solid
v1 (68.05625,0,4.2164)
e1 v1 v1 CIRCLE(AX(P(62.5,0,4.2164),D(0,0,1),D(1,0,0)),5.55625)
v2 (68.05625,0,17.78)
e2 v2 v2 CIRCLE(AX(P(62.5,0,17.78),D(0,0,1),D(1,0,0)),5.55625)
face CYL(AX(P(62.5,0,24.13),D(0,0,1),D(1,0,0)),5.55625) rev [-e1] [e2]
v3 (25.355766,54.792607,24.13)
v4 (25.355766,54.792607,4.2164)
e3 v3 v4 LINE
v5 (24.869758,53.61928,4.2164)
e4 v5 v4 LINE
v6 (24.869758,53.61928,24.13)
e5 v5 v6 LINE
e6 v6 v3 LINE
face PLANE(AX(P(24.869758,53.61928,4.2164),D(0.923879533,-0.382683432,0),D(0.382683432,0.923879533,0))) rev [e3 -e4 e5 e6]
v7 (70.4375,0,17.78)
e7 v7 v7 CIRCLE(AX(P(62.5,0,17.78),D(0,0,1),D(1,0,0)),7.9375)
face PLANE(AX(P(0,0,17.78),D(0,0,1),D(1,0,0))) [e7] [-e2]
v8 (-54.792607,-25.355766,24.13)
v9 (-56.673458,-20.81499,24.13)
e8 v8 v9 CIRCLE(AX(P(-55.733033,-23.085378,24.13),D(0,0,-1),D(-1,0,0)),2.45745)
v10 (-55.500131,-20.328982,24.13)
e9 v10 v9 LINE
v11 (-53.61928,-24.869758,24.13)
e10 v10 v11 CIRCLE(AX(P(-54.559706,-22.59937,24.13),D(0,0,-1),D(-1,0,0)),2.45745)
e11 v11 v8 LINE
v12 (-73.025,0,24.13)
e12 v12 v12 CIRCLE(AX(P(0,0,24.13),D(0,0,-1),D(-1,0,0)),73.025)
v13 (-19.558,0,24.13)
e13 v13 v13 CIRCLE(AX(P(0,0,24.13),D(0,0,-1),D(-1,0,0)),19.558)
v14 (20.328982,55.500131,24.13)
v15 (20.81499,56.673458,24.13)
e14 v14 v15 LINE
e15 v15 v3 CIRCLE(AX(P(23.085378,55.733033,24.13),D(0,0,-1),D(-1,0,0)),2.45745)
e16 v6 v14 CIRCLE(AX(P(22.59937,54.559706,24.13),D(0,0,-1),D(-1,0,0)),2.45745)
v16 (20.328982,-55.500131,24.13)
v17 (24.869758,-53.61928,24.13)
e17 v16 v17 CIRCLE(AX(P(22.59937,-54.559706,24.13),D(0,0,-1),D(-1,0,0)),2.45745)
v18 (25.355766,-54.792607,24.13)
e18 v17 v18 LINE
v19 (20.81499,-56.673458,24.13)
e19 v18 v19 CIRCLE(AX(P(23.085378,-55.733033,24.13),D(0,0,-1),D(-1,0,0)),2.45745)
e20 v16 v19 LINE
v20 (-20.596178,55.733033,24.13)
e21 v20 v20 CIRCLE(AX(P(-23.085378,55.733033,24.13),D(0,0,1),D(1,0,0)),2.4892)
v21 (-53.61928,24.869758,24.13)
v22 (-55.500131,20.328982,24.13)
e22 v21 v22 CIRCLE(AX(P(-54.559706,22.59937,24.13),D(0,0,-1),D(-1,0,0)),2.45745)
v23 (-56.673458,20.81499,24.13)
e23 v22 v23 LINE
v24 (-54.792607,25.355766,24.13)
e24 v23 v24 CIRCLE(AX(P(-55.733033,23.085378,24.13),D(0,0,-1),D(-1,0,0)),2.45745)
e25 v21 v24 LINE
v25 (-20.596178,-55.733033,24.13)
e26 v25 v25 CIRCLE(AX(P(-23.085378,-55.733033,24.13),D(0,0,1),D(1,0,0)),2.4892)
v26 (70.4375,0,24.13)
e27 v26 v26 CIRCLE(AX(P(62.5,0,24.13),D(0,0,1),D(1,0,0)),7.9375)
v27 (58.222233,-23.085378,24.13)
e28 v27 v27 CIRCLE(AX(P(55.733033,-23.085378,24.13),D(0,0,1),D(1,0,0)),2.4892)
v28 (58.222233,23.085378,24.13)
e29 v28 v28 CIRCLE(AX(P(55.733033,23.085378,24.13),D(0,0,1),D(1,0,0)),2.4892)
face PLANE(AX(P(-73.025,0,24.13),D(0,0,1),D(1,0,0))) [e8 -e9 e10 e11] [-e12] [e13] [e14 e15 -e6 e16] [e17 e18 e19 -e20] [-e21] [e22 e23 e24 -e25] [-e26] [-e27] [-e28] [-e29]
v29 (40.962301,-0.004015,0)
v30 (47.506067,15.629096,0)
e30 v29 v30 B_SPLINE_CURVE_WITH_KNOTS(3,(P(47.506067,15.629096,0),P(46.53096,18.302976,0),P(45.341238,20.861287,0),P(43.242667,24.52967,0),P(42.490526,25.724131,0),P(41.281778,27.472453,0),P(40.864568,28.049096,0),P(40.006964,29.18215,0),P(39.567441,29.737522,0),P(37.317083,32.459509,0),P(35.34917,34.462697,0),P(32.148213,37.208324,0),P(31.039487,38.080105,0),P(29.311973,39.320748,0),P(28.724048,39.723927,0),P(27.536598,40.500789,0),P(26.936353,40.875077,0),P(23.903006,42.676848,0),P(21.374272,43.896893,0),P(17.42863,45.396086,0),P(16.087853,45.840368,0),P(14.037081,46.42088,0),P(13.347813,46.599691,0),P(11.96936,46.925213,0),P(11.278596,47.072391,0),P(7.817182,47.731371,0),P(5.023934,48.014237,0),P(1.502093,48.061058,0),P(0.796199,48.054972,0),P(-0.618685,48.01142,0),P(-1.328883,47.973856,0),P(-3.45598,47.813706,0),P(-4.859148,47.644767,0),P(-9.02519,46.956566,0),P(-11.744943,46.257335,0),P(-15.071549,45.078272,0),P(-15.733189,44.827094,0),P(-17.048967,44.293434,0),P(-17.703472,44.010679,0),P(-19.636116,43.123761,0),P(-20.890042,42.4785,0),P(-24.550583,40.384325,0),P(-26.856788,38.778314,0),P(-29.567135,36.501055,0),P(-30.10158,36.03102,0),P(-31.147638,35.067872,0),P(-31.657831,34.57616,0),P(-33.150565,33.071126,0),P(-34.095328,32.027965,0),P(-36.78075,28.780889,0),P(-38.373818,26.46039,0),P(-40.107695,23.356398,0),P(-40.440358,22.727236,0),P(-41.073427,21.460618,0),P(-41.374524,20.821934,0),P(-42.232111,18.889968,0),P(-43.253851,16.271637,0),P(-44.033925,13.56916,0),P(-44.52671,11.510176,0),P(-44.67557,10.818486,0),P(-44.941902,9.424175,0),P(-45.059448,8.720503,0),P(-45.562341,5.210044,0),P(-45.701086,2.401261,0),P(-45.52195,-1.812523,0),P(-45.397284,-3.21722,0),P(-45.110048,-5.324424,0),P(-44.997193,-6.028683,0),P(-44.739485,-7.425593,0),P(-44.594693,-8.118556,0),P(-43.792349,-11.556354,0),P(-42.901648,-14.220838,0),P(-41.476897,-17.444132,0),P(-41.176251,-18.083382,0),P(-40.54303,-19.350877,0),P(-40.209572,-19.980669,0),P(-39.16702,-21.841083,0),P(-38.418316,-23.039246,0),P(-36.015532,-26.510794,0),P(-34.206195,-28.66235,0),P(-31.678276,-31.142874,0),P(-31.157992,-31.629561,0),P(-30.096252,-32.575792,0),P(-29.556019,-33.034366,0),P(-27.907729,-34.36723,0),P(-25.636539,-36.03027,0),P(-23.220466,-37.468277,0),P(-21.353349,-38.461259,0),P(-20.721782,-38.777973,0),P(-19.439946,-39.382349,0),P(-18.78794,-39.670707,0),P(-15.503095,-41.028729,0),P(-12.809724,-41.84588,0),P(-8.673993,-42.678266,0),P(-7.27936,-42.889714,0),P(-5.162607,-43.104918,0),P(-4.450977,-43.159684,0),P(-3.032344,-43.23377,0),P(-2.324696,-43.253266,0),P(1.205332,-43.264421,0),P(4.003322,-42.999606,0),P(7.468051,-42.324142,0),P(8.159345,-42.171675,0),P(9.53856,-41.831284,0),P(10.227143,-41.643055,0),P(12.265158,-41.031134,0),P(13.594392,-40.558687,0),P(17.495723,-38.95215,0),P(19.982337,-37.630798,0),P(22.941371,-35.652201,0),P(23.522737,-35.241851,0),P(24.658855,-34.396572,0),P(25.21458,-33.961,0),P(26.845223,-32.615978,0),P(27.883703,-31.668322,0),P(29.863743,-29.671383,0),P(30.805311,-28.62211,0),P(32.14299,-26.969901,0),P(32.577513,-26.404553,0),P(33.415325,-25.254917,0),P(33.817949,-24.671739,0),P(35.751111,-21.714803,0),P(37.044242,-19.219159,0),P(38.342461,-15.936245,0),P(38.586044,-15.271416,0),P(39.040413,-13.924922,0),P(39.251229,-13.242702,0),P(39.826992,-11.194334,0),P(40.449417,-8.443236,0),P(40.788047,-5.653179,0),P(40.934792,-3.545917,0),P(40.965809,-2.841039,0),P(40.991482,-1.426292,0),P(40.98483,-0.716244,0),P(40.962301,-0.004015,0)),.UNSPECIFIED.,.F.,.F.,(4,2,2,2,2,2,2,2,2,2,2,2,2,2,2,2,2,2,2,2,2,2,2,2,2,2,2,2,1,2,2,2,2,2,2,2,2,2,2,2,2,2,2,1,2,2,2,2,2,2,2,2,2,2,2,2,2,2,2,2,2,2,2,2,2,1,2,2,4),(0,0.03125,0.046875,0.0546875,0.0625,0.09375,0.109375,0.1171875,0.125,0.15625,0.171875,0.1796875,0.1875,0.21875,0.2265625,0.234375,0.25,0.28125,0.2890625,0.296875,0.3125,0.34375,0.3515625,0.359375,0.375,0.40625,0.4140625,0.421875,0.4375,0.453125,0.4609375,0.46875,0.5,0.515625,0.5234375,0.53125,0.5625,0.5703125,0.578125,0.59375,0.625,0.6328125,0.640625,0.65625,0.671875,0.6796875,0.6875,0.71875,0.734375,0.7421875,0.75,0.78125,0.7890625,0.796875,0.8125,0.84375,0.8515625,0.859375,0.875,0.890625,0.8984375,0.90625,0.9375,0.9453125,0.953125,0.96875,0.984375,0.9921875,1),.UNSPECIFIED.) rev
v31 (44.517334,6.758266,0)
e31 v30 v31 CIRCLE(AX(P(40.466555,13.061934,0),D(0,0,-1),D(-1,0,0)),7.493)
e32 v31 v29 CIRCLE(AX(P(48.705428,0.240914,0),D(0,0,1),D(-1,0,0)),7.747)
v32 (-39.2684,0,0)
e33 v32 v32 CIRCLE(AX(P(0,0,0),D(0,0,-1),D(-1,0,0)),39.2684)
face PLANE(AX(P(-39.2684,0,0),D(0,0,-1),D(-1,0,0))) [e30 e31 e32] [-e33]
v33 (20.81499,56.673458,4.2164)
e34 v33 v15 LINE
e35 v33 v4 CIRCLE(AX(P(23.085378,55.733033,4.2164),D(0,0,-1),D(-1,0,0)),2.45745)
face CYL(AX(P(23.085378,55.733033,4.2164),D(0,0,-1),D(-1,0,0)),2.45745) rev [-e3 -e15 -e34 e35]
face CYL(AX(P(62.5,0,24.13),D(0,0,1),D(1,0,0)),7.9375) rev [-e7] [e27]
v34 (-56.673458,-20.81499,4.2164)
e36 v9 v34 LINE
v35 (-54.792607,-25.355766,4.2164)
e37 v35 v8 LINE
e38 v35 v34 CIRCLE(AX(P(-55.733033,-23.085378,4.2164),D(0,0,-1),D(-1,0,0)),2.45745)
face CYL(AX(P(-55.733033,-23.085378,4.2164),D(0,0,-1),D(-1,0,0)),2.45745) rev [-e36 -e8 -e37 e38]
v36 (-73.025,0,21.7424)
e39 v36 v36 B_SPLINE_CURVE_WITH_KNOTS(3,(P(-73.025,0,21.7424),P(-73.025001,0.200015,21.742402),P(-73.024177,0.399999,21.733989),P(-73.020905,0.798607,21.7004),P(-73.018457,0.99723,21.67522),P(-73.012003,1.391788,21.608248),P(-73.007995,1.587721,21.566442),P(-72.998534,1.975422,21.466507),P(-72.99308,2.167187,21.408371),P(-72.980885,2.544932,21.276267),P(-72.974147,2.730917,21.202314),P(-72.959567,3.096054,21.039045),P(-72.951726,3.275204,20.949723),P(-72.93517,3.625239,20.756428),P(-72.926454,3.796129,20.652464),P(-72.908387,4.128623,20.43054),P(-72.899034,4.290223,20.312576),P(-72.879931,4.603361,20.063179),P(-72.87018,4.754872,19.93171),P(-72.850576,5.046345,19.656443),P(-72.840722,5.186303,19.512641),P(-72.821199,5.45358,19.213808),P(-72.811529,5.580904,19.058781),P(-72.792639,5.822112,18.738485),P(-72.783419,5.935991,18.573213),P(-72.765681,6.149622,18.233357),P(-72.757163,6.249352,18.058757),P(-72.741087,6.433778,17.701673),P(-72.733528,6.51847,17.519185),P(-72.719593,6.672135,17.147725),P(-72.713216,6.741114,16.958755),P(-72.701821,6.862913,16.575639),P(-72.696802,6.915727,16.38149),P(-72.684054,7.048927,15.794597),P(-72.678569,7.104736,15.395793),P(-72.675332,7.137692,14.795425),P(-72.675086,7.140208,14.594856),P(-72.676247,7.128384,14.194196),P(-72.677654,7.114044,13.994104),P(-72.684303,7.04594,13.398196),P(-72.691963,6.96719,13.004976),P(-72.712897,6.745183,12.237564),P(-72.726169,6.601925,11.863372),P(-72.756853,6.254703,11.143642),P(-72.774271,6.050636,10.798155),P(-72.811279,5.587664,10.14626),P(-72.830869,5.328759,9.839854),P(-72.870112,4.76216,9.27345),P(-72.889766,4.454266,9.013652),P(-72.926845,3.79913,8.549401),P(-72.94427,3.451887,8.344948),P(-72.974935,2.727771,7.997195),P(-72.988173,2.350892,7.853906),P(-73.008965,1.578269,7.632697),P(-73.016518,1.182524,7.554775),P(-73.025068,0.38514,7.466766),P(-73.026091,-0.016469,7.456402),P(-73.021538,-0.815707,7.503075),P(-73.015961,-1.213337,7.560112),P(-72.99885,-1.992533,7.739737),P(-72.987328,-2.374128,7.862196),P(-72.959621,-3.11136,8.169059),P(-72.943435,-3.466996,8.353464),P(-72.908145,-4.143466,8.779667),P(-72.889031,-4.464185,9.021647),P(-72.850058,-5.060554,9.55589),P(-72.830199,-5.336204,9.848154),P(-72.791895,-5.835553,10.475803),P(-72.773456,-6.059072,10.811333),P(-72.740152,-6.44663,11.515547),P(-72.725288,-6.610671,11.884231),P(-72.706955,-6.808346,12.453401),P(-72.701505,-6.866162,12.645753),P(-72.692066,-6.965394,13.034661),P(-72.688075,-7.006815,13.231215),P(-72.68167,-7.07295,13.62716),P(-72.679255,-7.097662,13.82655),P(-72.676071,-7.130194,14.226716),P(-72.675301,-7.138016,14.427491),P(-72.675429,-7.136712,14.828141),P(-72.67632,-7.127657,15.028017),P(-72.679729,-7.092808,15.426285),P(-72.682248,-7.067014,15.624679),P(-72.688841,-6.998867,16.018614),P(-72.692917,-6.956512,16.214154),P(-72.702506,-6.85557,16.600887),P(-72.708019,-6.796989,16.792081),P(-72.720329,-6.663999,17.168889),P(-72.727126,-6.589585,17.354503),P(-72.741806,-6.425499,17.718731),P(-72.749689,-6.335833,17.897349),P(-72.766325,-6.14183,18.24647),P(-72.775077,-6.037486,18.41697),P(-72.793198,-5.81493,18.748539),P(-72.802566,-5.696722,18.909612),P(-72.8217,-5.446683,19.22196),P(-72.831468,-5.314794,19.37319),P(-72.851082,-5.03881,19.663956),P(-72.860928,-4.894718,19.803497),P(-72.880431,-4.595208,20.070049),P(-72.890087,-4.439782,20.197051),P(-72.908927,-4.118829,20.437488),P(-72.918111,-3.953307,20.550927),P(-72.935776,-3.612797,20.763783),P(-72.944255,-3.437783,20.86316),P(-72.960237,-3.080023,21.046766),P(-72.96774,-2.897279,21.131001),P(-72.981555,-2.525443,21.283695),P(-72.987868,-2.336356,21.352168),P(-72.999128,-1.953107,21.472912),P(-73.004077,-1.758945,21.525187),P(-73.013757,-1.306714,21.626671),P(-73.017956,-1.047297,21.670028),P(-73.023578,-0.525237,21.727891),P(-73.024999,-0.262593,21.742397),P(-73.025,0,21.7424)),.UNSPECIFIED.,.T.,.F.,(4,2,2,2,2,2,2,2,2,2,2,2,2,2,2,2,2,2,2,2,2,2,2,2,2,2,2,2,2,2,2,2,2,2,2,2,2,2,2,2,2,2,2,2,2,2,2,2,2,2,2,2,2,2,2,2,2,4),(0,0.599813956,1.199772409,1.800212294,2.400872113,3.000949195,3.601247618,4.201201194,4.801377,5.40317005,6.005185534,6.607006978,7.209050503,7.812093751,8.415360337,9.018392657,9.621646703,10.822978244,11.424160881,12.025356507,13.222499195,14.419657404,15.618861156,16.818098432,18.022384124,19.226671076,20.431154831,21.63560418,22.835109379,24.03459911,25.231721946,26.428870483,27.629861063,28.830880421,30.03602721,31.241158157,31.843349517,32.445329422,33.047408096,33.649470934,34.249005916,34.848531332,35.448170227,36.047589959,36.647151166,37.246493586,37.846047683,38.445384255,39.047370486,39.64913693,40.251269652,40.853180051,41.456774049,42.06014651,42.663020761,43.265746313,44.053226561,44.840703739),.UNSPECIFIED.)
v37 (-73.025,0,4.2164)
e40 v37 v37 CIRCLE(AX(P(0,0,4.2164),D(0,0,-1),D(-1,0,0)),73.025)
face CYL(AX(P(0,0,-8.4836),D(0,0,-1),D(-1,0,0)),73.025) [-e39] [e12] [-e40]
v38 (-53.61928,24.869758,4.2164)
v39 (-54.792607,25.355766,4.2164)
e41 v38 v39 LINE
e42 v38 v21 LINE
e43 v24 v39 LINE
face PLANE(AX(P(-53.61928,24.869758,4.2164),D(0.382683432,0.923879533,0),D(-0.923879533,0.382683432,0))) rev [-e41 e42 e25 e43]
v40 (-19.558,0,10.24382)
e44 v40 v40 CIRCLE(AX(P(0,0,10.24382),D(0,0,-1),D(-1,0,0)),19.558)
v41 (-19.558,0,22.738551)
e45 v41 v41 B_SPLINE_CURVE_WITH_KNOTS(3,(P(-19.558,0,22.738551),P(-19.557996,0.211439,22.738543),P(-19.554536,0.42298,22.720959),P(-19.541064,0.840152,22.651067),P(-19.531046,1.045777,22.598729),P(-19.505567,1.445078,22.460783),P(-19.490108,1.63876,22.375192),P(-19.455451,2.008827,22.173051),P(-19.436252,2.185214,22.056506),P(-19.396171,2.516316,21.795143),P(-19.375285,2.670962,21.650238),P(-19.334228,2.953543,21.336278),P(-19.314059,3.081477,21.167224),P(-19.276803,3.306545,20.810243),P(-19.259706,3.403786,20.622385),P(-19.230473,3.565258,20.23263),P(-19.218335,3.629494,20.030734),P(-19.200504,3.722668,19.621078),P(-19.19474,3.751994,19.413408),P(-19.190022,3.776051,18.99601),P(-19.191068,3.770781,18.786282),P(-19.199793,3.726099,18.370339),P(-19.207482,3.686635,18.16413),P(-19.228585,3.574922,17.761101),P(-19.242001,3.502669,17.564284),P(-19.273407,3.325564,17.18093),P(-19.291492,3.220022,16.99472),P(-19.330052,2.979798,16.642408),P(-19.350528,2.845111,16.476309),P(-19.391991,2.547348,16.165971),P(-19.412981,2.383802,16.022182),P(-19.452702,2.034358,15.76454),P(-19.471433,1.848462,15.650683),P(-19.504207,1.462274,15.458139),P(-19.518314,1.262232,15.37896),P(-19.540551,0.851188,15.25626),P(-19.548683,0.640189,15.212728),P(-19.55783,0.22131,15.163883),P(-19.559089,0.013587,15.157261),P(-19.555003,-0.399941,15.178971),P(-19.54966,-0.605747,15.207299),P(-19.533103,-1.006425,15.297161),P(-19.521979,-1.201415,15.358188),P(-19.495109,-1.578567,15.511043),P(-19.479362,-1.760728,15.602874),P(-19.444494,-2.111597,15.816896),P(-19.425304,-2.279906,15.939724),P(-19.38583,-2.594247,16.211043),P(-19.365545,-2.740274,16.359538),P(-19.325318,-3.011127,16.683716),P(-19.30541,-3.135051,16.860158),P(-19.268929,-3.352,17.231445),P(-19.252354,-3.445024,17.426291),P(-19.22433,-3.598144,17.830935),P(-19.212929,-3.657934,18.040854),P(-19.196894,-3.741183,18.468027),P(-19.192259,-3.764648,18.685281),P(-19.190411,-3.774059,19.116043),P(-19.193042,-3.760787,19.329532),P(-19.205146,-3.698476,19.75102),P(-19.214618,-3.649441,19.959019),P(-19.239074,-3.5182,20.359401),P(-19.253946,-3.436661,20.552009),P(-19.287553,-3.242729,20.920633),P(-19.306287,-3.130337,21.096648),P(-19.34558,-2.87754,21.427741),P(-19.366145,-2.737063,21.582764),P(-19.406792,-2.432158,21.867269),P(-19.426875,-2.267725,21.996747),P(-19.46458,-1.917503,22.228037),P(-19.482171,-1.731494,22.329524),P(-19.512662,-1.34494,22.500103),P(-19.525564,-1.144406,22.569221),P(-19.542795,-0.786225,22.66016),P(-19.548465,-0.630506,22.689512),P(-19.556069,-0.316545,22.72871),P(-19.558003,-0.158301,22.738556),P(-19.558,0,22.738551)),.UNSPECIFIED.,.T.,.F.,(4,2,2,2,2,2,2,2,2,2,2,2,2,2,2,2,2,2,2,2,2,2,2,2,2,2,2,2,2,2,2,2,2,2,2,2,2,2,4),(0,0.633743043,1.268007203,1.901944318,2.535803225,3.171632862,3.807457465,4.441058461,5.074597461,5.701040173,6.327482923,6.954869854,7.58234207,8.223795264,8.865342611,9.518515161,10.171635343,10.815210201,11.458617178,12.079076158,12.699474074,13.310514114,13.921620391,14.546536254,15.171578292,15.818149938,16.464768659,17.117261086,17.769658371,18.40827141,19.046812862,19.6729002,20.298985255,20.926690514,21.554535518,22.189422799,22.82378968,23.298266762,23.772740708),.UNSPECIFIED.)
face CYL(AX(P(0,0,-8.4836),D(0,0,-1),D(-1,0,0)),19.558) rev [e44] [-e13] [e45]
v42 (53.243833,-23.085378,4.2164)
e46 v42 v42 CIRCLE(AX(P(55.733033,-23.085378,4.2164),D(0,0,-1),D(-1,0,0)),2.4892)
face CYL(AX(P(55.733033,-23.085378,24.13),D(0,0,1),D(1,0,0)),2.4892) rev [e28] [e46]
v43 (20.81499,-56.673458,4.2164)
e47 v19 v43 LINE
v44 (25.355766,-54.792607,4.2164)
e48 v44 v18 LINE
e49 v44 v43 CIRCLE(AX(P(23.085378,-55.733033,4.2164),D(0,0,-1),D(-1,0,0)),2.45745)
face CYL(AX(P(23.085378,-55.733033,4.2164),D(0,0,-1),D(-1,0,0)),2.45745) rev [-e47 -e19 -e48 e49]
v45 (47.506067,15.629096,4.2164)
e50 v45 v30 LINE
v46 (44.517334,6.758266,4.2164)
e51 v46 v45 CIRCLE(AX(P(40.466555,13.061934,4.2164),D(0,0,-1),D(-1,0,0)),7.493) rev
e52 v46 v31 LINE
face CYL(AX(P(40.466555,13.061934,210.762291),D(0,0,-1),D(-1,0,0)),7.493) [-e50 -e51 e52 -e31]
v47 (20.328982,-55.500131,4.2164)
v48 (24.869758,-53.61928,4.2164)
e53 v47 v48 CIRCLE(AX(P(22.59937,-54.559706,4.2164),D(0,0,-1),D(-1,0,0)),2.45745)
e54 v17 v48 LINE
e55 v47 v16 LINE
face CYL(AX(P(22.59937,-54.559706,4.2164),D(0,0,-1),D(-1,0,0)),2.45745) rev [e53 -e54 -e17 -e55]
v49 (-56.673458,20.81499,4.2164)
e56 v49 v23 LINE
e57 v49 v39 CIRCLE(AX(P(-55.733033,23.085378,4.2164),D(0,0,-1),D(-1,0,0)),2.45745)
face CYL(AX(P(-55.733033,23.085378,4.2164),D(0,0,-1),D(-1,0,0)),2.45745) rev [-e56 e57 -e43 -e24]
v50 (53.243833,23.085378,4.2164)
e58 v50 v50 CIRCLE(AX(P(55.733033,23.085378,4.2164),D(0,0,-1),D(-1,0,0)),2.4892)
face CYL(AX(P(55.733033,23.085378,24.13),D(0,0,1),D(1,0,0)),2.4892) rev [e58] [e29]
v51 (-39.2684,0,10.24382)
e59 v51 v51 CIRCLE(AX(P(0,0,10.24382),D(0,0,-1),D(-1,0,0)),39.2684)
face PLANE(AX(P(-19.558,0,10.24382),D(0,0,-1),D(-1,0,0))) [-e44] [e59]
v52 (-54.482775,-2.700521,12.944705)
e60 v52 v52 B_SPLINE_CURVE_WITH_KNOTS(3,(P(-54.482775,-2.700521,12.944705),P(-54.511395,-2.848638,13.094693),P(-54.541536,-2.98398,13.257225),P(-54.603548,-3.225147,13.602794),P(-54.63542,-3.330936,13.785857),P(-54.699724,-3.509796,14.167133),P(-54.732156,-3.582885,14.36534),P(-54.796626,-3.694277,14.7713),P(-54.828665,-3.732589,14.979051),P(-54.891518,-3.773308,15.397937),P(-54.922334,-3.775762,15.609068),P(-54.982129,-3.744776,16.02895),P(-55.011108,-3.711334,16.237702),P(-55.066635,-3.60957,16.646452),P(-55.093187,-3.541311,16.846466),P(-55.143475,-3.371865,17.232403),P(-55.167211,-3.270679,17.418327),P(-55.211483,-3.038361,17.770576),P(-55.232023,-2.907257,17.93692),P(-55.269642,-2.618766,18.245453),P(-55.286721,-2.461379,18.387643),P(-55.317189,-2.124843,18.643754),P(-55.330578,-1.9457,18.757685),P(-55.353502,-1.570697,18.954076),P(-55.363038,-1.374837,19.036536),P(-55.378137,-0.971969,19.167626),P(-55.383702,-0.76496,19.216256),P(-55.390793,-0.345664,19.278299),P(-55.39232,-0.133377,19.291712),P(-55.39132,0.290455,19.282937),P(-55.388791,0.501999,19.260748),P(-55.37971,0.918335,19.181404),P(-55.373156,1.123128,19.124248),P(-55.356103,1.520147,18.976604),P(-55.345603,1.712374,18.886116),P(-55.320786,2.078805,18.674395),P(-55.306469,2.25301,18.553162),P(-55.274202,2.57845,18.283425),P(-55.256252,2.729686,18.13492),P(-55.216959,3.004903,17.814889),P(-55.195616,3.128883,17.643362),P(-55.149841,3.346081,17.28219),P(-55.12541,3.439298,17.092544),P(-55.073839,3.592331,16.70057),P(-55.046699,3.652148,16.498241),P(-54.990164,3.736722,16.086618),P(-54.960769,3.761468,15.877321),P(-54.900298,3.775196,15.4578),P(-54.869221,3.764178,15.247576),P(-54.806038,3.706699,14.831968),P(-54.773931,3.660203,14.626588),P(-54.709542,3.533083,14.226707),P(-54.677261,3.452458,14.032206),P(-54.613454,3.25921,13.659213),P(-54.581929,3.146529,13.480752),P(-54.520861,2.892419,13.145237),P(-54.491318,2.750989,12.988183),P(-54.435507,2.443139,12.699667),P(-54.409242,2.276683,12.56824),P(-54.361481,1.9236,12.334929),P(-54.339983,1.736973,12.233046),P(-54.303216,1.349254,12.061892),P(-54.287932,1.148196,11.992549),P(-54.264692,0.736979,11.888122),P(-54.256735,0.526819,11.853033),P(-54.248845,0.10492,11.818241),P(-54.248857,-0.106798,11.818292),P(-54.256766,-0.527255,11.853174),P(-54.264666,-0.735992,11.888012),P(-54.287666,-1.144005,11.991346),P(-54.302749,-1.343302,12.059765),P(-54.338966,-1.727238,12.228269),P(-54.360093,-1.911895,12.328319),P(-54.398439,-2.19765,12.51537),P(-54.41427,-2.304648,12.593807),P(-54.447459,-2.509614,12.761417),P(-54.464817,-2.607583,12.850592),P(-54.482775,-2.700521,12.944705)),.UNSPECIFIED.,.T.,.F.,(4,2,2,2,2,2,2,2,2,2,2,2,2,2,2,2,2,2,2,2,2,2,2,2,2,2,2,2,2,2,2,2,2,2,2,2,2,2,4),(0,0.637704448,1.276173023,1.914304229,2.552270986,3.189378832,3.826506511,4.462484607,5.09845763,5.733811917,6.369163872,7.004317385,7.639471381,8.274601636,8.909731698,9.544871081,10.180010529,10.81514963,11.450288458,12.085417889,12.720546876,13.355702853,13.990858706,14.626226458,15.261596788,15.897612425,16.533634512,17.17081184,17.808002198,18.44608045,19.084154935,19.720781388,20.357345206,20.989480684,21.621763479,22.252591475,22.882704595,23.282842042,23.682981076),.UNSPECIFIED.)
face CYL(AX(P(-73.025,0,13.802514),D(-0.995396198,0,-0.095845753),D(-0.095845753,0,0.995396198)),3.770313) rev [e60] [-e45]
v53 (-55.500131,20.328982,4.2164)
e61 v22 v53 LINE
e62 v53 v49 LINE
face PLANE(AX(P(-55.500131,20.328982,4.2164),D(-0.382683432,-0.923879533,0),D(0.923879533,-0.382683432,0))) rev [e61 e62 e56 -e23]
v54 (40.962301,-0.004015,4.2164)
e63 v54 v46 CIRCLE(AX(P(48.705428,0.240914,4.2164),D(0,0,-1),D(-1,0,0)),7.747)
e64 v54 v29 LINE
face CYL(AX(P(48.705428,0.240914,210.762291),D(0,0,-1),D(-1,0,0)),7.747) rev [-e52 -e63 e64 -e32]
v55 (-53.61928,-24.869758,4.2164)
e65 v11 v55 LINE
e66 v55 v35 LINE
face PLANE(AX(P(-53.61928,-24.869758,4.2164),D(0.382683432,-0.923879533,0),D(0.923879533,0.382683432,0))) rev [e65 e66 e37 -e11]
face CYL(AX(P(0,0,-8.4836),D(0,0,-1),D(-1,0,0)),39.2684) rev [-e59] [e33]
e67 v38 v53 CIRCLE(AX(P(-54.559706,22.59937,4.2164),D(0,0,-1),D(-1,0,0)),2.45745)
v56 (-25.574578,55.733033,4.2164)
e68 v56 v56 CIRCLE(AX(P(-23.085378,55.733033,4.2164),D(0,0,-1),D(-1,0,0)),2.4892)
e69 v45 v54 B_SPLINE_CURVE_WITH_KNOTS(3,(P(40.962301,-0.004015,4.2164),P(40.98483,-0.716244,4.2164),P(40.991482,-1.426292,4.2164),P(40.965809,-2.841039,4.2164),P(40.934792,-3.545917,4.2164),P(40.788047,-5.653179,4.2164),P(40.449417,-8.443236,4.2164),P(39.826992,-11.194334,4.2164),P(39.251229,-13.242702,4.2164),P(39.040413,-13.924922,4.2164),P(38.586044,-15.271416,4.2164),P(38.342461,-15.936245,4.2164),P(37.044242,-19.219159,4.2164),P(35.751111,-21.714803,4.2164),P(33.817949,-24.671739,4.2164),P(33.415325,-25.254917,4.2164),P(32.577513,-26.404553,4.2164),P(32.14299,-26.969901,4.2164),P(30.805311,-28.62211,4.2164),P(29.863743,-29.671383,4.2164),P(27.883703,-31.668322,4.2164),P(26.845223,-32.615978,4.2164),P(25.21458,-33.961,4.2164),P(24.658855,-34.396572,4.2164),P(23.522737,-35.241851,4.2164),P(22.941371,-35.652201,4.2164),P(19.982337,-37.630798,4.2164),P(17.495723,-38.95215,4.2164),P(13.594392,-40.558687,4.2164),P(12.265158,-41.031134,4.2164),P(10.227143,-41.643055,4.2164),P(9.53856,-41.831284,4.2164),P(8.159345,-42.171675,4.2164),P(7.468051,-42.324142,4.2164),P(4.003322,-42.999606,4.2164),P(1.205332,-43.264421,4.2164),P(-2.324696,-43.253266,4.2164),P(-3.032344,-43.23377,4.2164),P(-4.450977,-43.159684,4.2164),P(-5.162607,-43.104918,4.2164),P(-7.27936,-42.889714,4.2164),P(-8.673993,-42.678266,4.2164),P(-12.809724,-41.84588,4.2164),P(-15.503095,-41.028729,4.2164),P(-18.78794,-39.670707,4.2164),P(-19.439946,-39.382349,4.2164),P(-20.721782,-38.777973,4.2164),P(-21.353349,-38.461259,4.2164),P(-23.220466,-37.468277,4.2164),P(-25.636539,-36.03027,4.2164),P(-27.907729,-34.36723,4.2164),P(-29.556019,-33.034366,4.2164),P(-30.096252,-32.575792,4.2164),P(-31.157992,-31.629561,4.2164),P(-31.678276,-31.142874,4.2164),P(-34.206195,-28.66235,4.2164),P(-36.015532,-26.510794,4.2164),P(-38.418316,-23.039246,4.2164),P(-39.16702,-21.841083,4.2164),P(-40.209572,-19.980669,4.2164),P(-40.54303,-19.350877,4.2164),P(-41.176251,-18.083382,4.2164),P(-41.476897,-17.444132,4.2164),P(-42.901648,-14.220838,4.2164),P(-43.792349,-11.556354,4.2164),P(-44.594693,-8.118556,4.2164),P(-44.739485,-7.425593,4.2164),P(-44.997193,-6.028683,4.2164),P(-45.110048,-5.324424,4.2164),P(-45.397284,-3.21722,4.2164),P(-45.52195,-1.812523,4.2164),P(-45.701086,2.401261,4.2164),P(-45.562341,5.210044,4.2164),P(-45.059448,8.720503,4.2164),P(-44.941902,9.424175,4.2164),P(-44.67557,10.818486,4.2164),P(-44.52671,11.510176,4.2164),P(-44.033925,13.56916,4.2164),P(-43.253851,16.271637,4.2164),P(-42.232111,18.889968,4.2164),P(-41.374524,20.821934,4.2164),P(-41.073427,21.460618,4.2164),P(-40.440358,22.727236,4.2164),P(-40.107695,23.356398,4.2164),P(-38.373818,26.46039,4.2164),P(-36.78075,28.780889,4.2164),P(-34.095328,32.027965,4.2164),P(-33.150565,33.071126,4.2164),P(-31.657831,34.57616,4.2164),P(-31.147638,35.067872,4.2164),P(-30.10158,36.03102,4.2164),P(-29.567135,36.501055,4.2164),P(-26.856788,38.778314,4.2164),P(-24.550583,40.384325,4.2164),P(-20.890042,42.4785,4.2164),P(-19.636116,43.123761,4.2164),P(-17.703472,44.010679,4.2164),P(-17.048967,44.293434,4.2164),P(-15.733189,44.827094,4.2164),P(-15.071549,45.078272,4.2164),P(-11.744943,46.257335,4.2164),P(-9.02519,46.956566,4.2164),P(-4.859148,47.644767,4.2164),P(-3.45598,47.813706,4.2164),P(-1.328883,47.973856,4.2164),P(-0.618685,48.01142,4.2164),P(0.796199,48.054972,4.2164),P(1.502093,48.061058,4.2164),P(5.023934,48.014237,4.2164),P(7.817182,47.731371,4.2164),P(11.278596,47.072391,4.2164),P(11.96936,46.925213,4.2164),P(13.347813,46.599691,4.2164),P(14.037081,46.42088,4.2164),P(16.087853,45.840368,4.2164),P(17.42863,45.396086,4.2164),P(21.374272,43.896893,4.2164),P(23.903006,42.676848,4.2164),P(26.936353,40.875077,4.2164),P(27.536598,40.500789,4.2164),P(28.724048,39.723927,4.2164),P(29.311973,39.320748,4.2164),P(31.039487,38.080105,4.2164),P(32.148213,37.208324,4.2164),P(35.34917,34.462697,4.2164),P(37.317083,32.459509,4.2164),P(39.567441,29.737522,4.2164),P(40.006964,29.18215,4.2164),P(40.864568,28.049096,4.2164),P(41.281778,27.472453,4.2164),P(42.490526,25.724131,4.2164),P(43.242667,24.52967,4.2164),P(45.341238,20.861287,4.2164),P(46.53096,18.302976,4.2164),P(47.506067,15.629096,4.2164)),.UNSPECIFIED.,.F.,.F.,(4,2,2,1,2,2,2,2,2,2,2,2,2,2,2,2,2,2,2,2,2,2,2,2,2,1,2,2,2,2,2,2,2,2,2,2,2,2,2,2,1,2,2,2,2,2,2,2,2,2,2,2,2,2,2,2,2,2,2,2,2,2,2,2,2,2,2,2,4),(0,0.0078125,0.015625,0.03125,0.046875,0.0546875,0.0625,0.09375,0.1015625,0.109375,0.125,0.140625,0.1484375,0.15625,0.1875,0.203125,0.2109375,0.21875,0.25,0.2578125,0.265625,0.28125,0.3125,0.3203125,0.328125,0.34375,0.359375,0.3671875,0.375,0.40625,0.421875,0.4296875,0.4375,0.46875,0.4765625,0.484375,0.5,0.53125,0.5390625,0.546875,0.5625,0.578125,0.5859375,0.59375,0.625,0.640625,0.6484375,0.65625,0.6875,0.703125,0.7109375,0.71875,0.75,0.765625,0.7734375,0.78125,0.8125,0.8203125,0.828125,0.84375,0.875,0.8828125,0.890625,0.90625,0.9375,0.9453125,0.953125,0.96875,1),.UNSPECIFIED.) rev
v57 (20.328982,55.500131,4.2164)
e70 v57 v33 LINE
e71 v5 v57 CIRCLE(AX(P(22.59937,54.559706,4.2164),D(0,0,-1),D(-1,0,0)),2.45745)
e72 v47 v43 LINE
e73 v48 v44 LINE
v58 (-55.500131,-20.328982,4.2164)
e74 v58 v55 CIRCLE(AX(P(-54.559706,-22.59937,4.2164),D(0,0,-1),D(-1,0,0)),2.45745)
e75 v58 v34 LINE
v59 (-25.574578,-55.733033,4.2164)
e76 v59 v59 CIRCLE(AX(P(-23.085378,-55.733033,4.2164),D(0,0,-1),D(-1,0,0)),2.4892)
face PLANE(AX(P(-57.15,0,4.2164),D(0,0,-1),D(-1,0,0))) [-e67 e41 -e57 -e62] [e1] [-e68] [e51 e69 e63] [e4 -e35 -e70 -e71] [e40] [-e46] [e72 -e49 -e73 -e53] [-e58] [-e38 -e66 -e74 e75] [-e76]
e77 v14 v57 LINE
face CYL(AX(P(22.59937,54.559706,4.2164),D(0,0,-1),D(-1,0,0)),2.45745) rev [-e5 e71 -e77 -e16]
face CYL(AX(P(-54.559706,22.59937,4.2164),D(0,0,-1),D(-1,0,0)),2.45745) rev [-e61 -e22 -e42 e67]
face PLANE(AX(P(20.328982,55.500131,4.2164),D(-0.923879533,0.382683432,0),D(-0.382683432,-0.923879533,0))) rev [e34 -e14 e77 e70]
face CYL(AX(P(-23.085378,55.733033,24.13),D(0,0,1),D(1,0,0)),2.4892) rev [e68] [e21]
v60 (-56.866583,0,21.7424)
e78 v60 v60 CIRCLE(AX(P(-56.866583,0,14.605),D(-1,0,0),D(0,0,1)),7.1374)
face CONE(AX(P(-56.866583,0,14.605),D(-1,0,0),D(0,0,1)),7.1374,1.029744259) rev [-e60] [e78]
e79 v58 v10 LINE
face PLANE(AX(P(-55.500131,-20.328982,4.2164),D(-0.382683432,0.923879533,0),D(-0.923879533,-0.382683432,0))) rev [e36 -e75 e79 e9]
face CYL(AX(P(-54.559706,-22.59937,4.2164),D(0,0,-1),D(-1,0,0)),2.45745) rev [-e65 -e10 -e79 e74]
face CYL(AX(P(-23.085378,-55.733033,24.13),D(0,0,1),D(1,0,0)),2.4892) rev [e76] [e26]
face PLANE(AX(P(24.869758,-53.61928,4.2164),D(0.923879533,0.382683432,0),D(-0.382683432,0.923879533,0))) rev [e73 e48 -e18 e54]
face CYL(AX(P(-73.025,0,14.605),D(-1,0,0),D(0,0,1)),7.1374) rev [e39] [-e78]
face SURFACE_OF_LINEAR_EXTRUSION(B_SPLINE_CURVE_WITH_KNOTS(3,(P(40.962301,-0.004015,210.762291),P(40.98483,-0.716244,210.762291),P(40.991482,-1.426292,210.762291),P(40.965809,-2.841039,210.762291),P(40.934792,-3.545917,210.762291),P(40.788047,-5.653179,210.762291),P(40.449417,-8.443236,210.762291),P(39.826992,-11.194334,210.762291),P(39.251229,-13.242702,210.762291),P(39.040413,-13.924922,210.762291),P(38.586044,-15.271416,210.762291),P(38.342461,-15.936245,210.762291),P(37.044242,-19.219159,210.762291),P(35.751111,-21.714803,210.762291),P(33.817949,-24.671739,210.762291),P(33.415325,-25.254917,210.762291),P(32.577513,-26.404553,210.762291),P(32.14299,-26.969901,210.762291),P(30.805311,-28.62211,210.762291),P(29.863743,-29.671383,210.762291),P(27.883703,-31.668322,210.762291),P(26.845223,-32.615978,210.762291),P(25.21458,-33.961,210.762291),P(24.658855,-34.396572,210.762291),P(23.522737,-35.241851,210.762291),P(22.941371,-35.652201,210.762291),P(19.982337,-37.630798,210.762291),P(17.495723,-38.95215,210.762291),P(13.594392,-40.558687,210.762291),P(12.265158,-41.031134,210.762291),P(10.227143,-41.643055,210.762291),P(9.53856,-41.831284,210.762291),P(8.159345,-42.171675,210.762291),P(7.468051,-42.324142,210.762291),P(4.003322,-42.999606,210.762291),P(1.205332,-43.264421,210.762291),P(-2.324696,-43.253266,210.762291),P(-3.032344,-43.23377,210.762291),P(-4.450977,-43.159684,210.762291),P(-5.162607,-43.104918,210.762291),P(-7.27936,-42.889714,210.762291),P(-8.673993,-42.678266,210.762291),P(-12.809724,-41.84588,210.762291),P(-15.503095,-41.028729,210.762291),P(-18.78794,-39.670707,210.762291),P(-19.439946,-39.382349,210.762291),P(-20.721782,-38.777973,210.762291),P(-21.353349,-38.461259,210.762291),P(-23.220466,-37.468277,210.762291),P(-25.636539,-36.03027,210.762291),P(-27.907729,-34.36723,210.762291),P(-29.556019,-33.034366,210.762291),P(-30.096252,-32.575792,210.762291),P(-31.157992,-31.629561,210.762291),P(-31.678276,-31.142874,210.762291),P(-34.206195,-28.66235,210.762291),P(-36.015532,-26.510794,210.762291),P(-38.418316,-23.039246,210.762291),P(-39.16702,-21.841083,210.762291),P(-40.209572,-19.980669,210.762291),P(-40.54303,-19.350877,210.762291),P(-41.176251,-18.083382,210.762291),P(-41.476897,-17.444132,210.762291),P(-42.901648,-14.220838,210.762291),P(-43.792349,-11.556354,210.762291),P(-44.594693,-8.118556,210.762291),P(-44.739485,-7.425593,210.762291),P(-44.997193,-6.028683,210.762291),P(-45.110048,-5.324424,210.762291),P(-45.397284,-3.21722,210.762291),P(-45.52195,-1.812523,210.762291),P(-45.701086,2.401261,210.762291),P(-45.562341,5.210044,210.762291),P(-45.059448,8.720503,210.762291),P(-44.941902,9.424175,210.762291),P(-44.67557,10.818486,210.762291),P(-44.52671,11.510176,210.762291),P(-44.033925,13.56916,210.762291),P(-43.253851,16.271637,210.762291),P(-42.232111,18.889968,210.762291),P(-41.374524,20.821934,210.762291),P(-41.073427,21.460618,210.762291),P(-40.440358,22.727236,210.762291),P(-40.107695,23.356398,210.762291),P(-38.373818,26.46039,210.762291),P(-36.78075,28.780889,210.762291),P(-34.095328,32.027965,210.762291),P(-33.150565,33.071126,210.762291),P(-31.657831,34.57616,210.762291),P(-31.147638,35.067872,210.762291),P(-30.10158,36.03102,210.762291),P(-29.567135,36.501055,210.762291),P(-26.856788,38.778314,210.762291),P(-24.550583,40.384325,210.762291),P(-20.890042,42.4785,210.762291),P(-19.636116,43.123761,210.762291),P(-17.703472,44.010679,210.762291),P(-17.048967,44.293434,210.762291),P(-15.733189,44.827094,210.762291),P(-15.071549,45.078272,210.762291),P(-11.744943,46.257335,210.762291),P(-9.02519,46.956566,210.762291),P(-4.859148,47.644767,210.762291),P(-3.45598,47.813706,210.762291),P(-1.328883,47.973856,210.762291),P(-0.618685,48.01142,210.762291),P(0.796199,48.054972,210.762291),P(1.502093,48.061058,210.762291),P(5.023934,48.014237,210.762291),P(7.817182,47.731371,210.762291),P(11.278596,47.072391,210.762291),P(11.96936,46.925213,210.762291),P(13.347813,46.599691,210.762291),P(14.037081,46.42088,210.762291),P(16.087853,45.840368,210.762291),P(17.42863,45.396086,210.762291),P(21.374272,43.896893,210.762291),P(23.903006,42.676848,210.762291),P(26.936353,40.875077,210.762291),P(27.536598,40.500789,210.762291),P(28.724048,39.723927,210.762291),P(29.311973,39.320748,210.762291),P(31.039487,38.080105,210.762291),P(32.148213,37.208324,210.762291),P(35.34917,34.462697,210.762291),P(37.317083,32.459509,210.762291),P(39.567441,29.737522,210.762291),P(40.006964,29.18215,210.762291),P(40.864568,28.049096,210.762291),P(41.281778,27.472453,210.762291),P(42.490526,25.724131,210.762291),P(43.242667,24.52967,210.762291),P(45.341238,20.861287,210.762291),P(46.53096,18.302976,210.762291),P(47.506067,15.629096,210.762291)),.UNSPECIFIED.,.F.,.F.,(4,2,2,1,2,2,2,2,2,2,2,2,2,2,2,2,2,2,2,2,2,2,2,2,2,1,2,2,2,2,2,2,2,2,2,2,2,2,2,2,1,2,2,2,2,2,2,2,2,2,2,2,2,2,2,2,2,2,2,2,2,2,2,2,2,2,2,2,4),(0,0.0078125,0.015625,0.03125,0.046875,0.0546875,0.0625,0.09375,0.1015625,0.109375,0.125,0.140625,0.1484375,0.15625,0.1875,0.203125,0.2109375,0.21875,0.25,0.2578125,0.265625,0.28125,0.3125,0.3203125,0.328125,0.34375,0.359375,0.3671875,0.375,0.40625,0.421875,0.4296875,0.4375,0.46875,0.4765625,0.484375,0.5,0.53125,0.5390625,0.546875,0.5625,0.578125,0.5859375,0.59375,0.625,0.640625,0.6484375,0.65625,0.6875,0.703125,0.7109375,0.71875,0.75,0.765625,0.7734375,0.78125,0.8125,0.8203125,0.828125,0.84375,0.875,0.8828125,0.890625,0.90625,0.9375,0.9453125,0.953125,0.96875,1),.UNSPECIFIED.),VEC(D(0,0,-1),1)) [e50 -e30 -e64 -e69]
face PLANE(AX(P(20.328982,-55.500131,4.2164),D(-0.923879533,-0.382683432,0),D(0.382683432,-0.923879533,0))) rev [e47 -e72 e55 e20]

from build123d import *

# Parameters (mm, degrees)
CUT_EXTRUDE1_START                = 4.2164
SKETCH18_R                        = 57.15
CUT_EXTRUDE1_DEPTH                = 4.2164
PIPE_TAP_DRILL_FOR_3_8_TAP2_D     = 14.2748
PIPE_TAP_DRILL_FOR_3_8_TAP2_DEPTH = 16.158417418
PIPE_TAP_DRILL_FOR_3_8_TAP2_TIP   = 4.288582582
F_10_CLEARANCE_HOLE1_D            = 4.9784
CIRPATTERN1_COUNT                 = 8
CLEARANCING_START                 = -4.2164
SKETCH32_R                        = 73.025
CLEARANCING_DEPTH                 = 4.2164
F_10_START                        = 4.2164
F_10_0_1935_DIAMETER_SLOT1_DEPTH  = 19.9136
CIRPATTERN2_COUNT                 = 8


# Read off the part's stored shape, not the designer's step: #10 (0.1935) Diameter Slot1
with BuildPart() as part:
    # Sketch25 → Revolve1 (revolve)
    with BuildSketch(Plane(origin=(0, 0, 0), x_dir=(1, 0, 0), z_dir=(0, 1, 0))):
        Polygon((-19.558, -24.13), (-19.558, -10.24382), (-39.2684, -10.24382), (-39.2684, 0), (-57.15, 0), (-57.15, -4.2164), (-73.025, -4.2164), (-73.025, -24.13), align=None)
    revolve(axis=Axis((0, 0, -8.4836), (0, 0, 1)))

    # Sketch18 → Cut-Extrude1 (cut)
    with BuildSketch(Plane.XY.offset(CUT_EXTRUDE1_START)):
        Circle(SKETCH18_R)
        with BuildLine():
            add(Edge.make_bspline(
                [(41.089237213, 0), (41.091962531, -0.086157587), (41.097413749, -0.258491166), (41.10355964, -0.517077072), (41.10820678, -0.775748178), (41.11421023, -1.293415642), (41.109015311, -2.589274196), (41.017814103, -4.490313926), (40.7831208, -6.729807087), (40.462314107, -8.787506492), (40.037808727, -10.829994254), (39.510298345, -12.852043551), (38.880746853, -14.848458078), (38.15038378, -16.814086746), (37.320701547, -18.743836999), (36.393451781, -20.63268838), (35.370641466, -22.475705706), (34.254528452, -24.268052099), (33.047616433, -26.005001751), (31.752649319, -27.681952446), (30.372605018, -29.294437787), (28.910688618, -30.83813911), (27.370324987, -32.308897058), (25.755150794, -33.702722776), (24.069005972, -35.015808715), (22.315924639, -36.244539), (20.500125495, -37.385499343), (18.62600172, -38.435486481), (16.698110388, -39.3915171), (14.721161433, -40.250836227), (12.700006186, -41.010925075), (10.639625512, -41.669508306), (8.545117571, -42.224560694), (6.421685244, -42.674313186), (4.274623243, -43.017258312), (2.109304944, -43.252154961), (-0.068831028, -43.378032487), (-2.254294428, -43.394194133), (-4.441557201, -43.300219785), (-6.625067428, -43.095968006), (-8.799263397, -42.781577389), (-10.958587737, -42.35746718), (-13.097501591, -41.8243372), (-15.210498799, -41.183167044), (-17.292120038, -40.435214565), (-19.336966901, -39.582013644), (-21.339715858, -38.62537124), (-23.295132091, -37.567363743), (-25.198083132, -36.410332623), (-27.043552306, -35.156879378), (-28.826651909, -33.809859817), (-30.542636113, -32.372377659), (-32.186913551, -30.847777489), (-33.75505955, -29.239637062), (-35.242827981, -27.551758997), (-36.6461627, -25.788161864), (-37.961208531, -23.953070684), (-39.184321792, -22.050906876), (-40.312080298, -20.086277666), (-41.34129285, -18.063964982), (-42.269008156, -15.988913871), (-43.092523175, -13.866220454), (-43.809390856, -11.701119456), (-44.417427247, -9.498971339), (-44.914717965, -7.265249075), (-45.299623986, -5.005524575), (-45.570786769, -2.725454833), (-45.727132667, -0.430767795), (-45.767876634, 1.872751999), (-45.692525205, 4.179277959), (-45.500878745, 6.482956161), (-45.193032951, 8.777920163), (-44.76937961, 11.058305925), (-44.2306066, 13.318266753), (-43.577697135, 15.551988265), (-42.811928261, 17.753703317), (-41.934868588, 19.917706858), (-40.948375273, 22.038370685), (-39.854590259, 24.110158043), (-38.655935769, 26.127638043), (-37.35510908, 28.085499861), (-35.95507656, 29.978566677), (-34.45906702, 31.801809315), (-32.870564351, 33.550359561), (-31.193299507, 35.2195231), (-29.431241811, 36.804792072), (-27.58858964, 38.301857174), (-25.669760482, 39.706619311), (-23.67938041, 41.015200739), (-21.62227298, 42.22395569), (-19.503447594, 43.329480427), (-17.328087349, 44.32862273), (-15.101536401, 45.218490759), (-12.829286876, 45.996461288), (-10.51696536, 46.660187279), (-8.170319005, 47.207604779), (-5.795201275, 47.63693911), (-3.397557376, 47.946710349), (-0.983409407, 48.13573807), (1.441158736, 48.203145338), (3.870016668, 48.148361942), (6.297002983, 47.971126851), (8.715940862, 47.671489899), (11.120653763, 47.249812672), (13.504981164, 46.706768607), (15.862794321, 46.043342297), (18.188011992, 45.260827993), (20.47461609, 44.360827321), (22.71666723, 43.345246195), (24.908320125, 42.216290953), (27.043838787, 40.976463712), (29.117611505, 39.628556947), (31.12416555, 38.175647316), (33.058181574, 36.621088743), (34.914507669, 34.968504765), (36.688173034, 33.221780166), (38.374401232, 31.385051924), (39.968622994, 29.462699478), (41.466488529, 27.459334348), (42.863879321, 25.37978913), (44.156919368, 23.229105887), (45.341985843, 21.012523976), (46.415719137, 18.735467323), (47.152873419, 16.943563677), (47.537044371, 15.914838228), (47.625380995, 15.672606956)],
                knots=[0, 0, 0, 0, 0.000898736, 0.001797664, 0.002696784, 0.003596095, 0.007195255, 0.016206602, 0.023429565, 0.030664921, 0.03791271, 0.04517297, 0.052445735, 0.059731037, 0.067028905, 0.074339368, 0.081662453, 0.088998186, 0.096346593, 0.103707696, 0.111081519, 0.118468084, 0.125867414, 0.13327953, 0.140704451, 0.148142199, 0.155592793, 0.163056252, 0.170532595, 0.178021841, 0.185524007, 0.193039111, 0.200567171, 0.208108204, 0.215662226, 0.223229255, 0.230809306, 0.238402396, 0.24600854, 0.253627754, 0.261260054, 0.268905454, 0.27656397, 0.284235617, 0.291920409, 0.29961836, 0.307329485, 0.315053798, 0.322791313, 0.330542044, 0.338306004, 0.346083208, 0.353873668, 0.361677398, 0.369494411, 0.37732472, 0.385168337, 0.393025277, 0.400895551, 0.408779172, 0.416676152, 0.424586504, 0.432510241, 0.440447374, 0.448397915, 0.456361877, 0.464339271, 0.472330109, 0.480334403, 0.488352164, 0.496383405, 0.504428136, 0.512486369, 0.520558115, 0.528643386, 0.536742193, 0.544854546, 0.552980457, 0.561119937, 0.569272997, 0.577439648, 0.585619899, 0.593813763, 0.60202125, 0.61024237, 0.618477134, 0.626725552, 0.634987634, 0.643263392, 0.651552835, 0.659855974, 0.668172818, 0.676503379, 0.684847665, 0.693205688, 0.701577457, 0.709962981, 0.718362272, 0.726775338, 0.73520219, 0.743642837, 0.752097289, 0.760565555, 0.769047646, 0.777543571, 0.786053339, 0.79457696, 0.803114443, 0.811665798, 0.820231034, 0.828810161, 0.837403187, 0.846010122, 0.854630975, 0.863265756, 0.871914473, 0.880577136, 0.889253753, 0.897944334, 0.906648887, 0.915367423, 0.924099948, 0.932846474, 0.941607007, 0.944295232, 0.944295232, 0.944295232, 0.944295232], degree=3))
            ThreePointArc((47.625380995, 15.672606956), (47.687720846, 10.629001226), (44.585991464, 6.651424093))
            ThreePointArc((44.585991464, 6.651424093), (41.960682048, 3.786728615), (41.089237213, 0))
        make_face(mode=Mode.SUBTRACT)
    extrude(amount=-CUT_EXTRUDE1_DEPTH, mode=Mode.SUBTRACT)

    # Sketch20 → Turbine Shaft Hole (revolve, cut)
    with BuildSketch(Plane(origin=(0, 0, 0), x_dir=(1, 0, 0), z_dir=(0, 1, 0))):
        Polygon((62.5, -4.2164), (62.5, -24.13), (70.4375, -24.13), (70.4375, -17.78), (68.05625, -17.78), (68.05625, -4.2164), align=None)
    revolve(axis=Axis((62.5, 0, 24.13), (0, 0, -1)), mode=Mode.SUBTRACT)

    # Pipe Tap Drill for 3/8 Tap2
    with Locations(Plane(origin=(-73.025, 0, 14.605), x_dir=(0, 0, -1), z_dir=(-1, 0, 0))):
        with Locations((0, 0)):
            Hole(PIPE_TAP_DRILL_FOR_3_8_TAP2_D / 2, depth=PIPE_TAP_DRILL_FOR_3_8_TAP2_DEPTH)
            with Locations((0, 0, -(PIPE_TAP_DRILL_FOR_3_8_TAP2_DEPTH + PIPE_TAP_DRILL_FOR_3_8_TAP2_TIP / 2))):  # 118° drill point
                Cone(0, PIPE_TAP_DRILL_FOR_3_8_TAP2_D / 2, PIPE_TAP_DRILL_FOR_3_8_TAP2_TIP, mode=Mode.SUBTRACT)

    # #10 Clearance Hole1 (through all)
    with Locations(Plane(origin=(55.733032799, -23.085378057, 24.13), x_dir=(1, 0, 0), z_dir=(0, 0, 1))):
        with Locations((0, 0)):
            f_10_clearance_hole1 = Hole(F_10_CLEARANCE_HOLE1_D / 2)

    # CirPattern1: #10 Clearance Hole1 ×8 about axis, 4 skipped
    cirpattern1_axis = Axis((0, 0, 0), (0, 0, 1))
    add([f_10_clearance_hole1.rotate(cirpattern1_axis, i * 360 / CIRPATTERN1_COUNT) for i in range(1, CIRPATTERN1_COUNT) if i not in (2, 4, 5, 7)], mode=Mode.SUBTRACT)

    # Sketch30 → Cut-Revolve1 (revolve, cut)
    with BuildSketch(Plane(origin=(0, 0, 0), x_dir=(1, 0, 0), z_dir=(0, 1, 0))):
        Polygon((0, -20.834021296), (-73.025, -13.802513551), (-73.386368439, -17.55546828), (-0.361368439, -24.586976025), align=None)
    revolve(axis=Axis((-73.025, 0, 13.802513551), (0.9953961983671795, 0, 0.09584575252021674)), mode=Mode.SUBTRACT)

    # Sketch32 → Clearancing (cut)
    with BuildSketch(Plane(origin=(0, 0, 0), x_dir=(-1, 0, 0), z_dir=(0, 0, -1)).offset(CLEARANCING_START)):
        Circle(SKETCH32_R)
        with BuildLine():
            ThreePointArc((-47.506067229, 15.629095748), (-47.567368082, 10.669550114), (-44.51733419, 6.758265932))
            ThreePointArc((-44.51733419, 6.758265932), (-41.848269617, 3.845825531), (-40.962300701, -0.004015228))
            add(Edge.make_bspline(
                [(-40.962300701, -0.004015228), (-40.984829754, -0.716243545), (-40.991482345, -1.426292399), (-40.965808515, -2.841039211), (-40.934791994, -3.545916987), (-40.788046598, -5.65317915), (-40.449416827, -8.44323574), (-39.826992242, -11.194334019), (-39.251228801, -13.242702158), (-39.04041264, -13.924921757), (-38.586043887, -15.271416492), (-38.342460818, -15.936244836), (-37.044241995, -19.219159068), (-35.751111298, -21.714802599), (-33.817948717, -24.671739224), (-33.415325439, -25.254916955), (-32.577512865, -26.404553153), (-32.142989691, -26.969901223), (-30.805310798, -28.622109954), (-29.863742521, -29.67138319), (-27.88370287, -31.668321975), (-26.84522274, -32.615978344), (-25.214580249, -33.961000268), (-24.658855428, -34.396572383), (-23.52273746, -35.241850655), (-22.941371199, -35.652200602), (-19.982337143, -37.630798215), (-17.495723306, -38.952149767), (-13.594391809, -40.558687212), (-12.265158452, -41.031133778), (-10.227142901, -41.643055288), (-9.538560062, -41.831284287), (-8.159344959, -42.171675018), (-7.468051402, -42.324142065), (-4.003321953, -42.999606071), (-1.205332292, -43.264420661), (2.324696242, -43.253266134), (3.032343885, -43.233770306), (4.450976737, -43.159684207), (5.16260658, -43.104918353), (7.279359647, -42.889714494), (8.673993393, -42.678265993), (12.809724164, -41.845880015), (15.503095197, -41.028729387), (18.787939685, -39.670706521), (19.439945622, -39.382349429), (20.721782261, -38.777972555), (21.353348612, -38.461258619), (23.220466367, -37.468277477), (25.636538884, -36.03026989), (27.907728904, -34.367230475), (29.556019298, -33.034366172), (30.096251631, -32.575792031), (31.157992098, -31.629561277), (31.678275818, -31.142874487), (34.206194586, -28.662350465), (36.015531715, -26.510793678), (38.41831625, -23.039245987), (39.16701973, -21.841083162), (40.20957198, -19.98066895), (40.543029676, -19.350876534), (41.176251076, -18.083381709), (41.476896624, -17.444132119), (42.901648241, -14.220838418), (43.792349276, -11.556354365), (44.594692676, -8.118555948), (44.739484647, -7.425593495), (44.997193357, -6.028683216), (45.110048425, -5.324423569), (45.397284161, -3.217220036), (45.521950193, -1.812522973), (45.701086012, 2.401261181), (45.562340657, 5.210043831), (45.059447785, 8.720503026), (44.941902272, 9.424175437), (44.675570213, 10.818485677), (44.526710242, 11.510176401), (44.03392467, 13.569160455), (43.253850892, 16.271636591), (42.232110927, 18.889968175), (41.374523909, 20.821933821), (41.073427004, 21.460617921), (40.440358133, 22.727235888), (40.107694699, 23.35639756), (38.373818129, 26.460390162), (36.780750271, 28.78088885), (34.095328382, 32.027965174), (33.150564893, 33.07112628), (31.657831232, 34.576159768), (31.147637834, 35.06787246), (30.101580295, 36.031020228), (29.567134533, 36.501054535), (26.856787595, 38.778313639), (24.550582917, 40.384325472), (20.890041552, 42.47849974), (19.636115903, 43.123761403), (17.703471684, 44.01067886), (17.048967242, 44.293434078), (15.733188711, 44.827093949), (15.071549163, 45.078271992), (11.744943292, 46.257335392), (9.025190072, 46.956566279), (4.859147554, 47.644767103), (3.455979938, 47.813706456), (1.328883106, 47.973856364), (0.6186853, 48.011419961), (-0.796199225, 48.054972454), (-1.502092621, 48.06105803), (-5.023934167, 48.014237149), (-7.817182412, 47.731371248), (-11.278596108, 47.072391218), (-11.96936046, 46.925213328), (-13.347812594, 46.599690607), (-14.03708102, 46.420880282), (-16.087853103, 45.84036778), (-17.428630402, 45.396086399), (-21.374271765, 43.89689302), (-23.903005899, 42.67684778), (-26.936352555, 40.875077272), (-27.536597899, 40.500788916), (-28.724048455, 39.723926887), (-29.311972723, 39.320747942), (-31.039486686, 38.080104884), (-32.148213344, 37.208324215), (-35.349169758, 34.462697204), (-37.317082683, 32.459509238), (-39.567440801, 29.737522075), (-40.006964214, 29.18215008), (-40.86456786, 28.049096194), (-41.281778161, 27.472452922), (-42.490525828, 25.724130807), (-43.242666913, 24.529670436), (-45.341238448, 20.861286589), (-46.530959758, 18.302975659), (-47.506067229, 15.629095748)],
                knots=[0, 0, 0, 0, 0.0078125, 0.0078125, 0.015625, 0.015625, 0.03125, 0.046875, 0.046875, 0.0546875, 0.0546875, 0.0625, 0.0625, 0.09375, 0.09375, 0.1015625, 0.1015625, 0.109375, 0.109375, 0.125, 0.125, 0.140625, 0.140625, 0.1484375, 0.1484375, 0.15625, 0.15625, 0.1875, 0.1875, 0.203125, 0.203125, 0.2109375, 0.2109375, 0.21875, 0.21875, 0.25, 0.25, 0.2578125, 0.2578125, 0.265625, 0.265625, 0.28125, 0.28125, 0.3125, 0.3125, 0.3203125, 0.3203125, 0.328125, 0.328125, 0.34375, 0.359375, 0.359375, 0.3671875, 0.3671875, 0.375, 0.375, 0.40625, 0.40625, 0.421875, 0.421875, 0.4296875, 0.4296875, 0.4375, 0.4375, 0.46875, 0.46875, 0.4765625, 0.4765625, 0.484375, 0.484375, 0.5, 0.5, 0.53125, 0.53125, 0.5390625, 0.5390625, 0.546875, 0.546875, 0.5625, 0.578125, 0.578125, 0.5859375, 0.5859375, 0.59375, 0.59375, 0.625, 0.625, 0.640625, 0.640625, 0.6484375, 0.6484375, 0.65625, 0.65625, 0.6875, 0.6875, 0.703125, 0.703125, 0.7109375, 0.7109375, 0.71875, 0.71875, 0.75, 0.75, 0.765625, 0.765625, 0.7734375, 0.7734375, 0.78125, 0.78125, 0.8125, 0.8125, 0.8203125, 0.8203125, 0.828125, 0.828125, 0.84375, 0.84375, 0.875, 0.875, 0.8828125, 0.8828125, 0.890625, 0.890625, 0.90625, 0.90625, 0.9375, 0.9375, 0.9453125, 0.9453125, 0.953125, 0.953125, 0.96875, 0.96875, 1, 1, 1, 1], degree=3))
        make_face(mode=Mode.SUBTRACT)
    extrude(amount=CLEARANCING_DEPTH, mode=Mode.SUBTRACT)

    # #10 (0.1935) Diameter Slot1 outline → #10 (0.1935) Diameter Slot1 (cut)
    with BuildSketch(Plane.XY.offset(F_10_START)):
        with BuildLine():
            ThreePointArc((20.8149903, -56.6734582), (24.025803458, -58.003420556), (25.355765815, -54.792607398))
            Line((25.355765815, -54.792607398), (24.869757855, -53.619280392))
            ThreePointArc((24.869757855, -53.619280392), (21.658944697, -52.289318035), (20.328982341, -55.500131193))
            Line((20.328982341, -55.500131193), (20.8149903, -56.6734582))
        make_face()
    f_10_0_1935_diameter_slot1 = extrude(amount=F_10_0_1935_DIAMETER_SLOT1_DEPTH, mode=Mode.SUBTRACT)

    # CirPattern2: #10 (0.1935) Diameter Slot1 ×8 about axis, 4 skipped
    cirpattern2_axis = Axis((0, 0, -50.361336866), (0, 0, 1))
    add([f_10_0_1935_diameter_slot1.rotate(cirpattern2_axis, i * 360 / CIRPATTERN2_COUNT) for i in range(1, CIRPATTERN2_COUNT) if i not in (1, 2, 4, 7)], mode=Mode.SUBTRACT)


solid = part.part
